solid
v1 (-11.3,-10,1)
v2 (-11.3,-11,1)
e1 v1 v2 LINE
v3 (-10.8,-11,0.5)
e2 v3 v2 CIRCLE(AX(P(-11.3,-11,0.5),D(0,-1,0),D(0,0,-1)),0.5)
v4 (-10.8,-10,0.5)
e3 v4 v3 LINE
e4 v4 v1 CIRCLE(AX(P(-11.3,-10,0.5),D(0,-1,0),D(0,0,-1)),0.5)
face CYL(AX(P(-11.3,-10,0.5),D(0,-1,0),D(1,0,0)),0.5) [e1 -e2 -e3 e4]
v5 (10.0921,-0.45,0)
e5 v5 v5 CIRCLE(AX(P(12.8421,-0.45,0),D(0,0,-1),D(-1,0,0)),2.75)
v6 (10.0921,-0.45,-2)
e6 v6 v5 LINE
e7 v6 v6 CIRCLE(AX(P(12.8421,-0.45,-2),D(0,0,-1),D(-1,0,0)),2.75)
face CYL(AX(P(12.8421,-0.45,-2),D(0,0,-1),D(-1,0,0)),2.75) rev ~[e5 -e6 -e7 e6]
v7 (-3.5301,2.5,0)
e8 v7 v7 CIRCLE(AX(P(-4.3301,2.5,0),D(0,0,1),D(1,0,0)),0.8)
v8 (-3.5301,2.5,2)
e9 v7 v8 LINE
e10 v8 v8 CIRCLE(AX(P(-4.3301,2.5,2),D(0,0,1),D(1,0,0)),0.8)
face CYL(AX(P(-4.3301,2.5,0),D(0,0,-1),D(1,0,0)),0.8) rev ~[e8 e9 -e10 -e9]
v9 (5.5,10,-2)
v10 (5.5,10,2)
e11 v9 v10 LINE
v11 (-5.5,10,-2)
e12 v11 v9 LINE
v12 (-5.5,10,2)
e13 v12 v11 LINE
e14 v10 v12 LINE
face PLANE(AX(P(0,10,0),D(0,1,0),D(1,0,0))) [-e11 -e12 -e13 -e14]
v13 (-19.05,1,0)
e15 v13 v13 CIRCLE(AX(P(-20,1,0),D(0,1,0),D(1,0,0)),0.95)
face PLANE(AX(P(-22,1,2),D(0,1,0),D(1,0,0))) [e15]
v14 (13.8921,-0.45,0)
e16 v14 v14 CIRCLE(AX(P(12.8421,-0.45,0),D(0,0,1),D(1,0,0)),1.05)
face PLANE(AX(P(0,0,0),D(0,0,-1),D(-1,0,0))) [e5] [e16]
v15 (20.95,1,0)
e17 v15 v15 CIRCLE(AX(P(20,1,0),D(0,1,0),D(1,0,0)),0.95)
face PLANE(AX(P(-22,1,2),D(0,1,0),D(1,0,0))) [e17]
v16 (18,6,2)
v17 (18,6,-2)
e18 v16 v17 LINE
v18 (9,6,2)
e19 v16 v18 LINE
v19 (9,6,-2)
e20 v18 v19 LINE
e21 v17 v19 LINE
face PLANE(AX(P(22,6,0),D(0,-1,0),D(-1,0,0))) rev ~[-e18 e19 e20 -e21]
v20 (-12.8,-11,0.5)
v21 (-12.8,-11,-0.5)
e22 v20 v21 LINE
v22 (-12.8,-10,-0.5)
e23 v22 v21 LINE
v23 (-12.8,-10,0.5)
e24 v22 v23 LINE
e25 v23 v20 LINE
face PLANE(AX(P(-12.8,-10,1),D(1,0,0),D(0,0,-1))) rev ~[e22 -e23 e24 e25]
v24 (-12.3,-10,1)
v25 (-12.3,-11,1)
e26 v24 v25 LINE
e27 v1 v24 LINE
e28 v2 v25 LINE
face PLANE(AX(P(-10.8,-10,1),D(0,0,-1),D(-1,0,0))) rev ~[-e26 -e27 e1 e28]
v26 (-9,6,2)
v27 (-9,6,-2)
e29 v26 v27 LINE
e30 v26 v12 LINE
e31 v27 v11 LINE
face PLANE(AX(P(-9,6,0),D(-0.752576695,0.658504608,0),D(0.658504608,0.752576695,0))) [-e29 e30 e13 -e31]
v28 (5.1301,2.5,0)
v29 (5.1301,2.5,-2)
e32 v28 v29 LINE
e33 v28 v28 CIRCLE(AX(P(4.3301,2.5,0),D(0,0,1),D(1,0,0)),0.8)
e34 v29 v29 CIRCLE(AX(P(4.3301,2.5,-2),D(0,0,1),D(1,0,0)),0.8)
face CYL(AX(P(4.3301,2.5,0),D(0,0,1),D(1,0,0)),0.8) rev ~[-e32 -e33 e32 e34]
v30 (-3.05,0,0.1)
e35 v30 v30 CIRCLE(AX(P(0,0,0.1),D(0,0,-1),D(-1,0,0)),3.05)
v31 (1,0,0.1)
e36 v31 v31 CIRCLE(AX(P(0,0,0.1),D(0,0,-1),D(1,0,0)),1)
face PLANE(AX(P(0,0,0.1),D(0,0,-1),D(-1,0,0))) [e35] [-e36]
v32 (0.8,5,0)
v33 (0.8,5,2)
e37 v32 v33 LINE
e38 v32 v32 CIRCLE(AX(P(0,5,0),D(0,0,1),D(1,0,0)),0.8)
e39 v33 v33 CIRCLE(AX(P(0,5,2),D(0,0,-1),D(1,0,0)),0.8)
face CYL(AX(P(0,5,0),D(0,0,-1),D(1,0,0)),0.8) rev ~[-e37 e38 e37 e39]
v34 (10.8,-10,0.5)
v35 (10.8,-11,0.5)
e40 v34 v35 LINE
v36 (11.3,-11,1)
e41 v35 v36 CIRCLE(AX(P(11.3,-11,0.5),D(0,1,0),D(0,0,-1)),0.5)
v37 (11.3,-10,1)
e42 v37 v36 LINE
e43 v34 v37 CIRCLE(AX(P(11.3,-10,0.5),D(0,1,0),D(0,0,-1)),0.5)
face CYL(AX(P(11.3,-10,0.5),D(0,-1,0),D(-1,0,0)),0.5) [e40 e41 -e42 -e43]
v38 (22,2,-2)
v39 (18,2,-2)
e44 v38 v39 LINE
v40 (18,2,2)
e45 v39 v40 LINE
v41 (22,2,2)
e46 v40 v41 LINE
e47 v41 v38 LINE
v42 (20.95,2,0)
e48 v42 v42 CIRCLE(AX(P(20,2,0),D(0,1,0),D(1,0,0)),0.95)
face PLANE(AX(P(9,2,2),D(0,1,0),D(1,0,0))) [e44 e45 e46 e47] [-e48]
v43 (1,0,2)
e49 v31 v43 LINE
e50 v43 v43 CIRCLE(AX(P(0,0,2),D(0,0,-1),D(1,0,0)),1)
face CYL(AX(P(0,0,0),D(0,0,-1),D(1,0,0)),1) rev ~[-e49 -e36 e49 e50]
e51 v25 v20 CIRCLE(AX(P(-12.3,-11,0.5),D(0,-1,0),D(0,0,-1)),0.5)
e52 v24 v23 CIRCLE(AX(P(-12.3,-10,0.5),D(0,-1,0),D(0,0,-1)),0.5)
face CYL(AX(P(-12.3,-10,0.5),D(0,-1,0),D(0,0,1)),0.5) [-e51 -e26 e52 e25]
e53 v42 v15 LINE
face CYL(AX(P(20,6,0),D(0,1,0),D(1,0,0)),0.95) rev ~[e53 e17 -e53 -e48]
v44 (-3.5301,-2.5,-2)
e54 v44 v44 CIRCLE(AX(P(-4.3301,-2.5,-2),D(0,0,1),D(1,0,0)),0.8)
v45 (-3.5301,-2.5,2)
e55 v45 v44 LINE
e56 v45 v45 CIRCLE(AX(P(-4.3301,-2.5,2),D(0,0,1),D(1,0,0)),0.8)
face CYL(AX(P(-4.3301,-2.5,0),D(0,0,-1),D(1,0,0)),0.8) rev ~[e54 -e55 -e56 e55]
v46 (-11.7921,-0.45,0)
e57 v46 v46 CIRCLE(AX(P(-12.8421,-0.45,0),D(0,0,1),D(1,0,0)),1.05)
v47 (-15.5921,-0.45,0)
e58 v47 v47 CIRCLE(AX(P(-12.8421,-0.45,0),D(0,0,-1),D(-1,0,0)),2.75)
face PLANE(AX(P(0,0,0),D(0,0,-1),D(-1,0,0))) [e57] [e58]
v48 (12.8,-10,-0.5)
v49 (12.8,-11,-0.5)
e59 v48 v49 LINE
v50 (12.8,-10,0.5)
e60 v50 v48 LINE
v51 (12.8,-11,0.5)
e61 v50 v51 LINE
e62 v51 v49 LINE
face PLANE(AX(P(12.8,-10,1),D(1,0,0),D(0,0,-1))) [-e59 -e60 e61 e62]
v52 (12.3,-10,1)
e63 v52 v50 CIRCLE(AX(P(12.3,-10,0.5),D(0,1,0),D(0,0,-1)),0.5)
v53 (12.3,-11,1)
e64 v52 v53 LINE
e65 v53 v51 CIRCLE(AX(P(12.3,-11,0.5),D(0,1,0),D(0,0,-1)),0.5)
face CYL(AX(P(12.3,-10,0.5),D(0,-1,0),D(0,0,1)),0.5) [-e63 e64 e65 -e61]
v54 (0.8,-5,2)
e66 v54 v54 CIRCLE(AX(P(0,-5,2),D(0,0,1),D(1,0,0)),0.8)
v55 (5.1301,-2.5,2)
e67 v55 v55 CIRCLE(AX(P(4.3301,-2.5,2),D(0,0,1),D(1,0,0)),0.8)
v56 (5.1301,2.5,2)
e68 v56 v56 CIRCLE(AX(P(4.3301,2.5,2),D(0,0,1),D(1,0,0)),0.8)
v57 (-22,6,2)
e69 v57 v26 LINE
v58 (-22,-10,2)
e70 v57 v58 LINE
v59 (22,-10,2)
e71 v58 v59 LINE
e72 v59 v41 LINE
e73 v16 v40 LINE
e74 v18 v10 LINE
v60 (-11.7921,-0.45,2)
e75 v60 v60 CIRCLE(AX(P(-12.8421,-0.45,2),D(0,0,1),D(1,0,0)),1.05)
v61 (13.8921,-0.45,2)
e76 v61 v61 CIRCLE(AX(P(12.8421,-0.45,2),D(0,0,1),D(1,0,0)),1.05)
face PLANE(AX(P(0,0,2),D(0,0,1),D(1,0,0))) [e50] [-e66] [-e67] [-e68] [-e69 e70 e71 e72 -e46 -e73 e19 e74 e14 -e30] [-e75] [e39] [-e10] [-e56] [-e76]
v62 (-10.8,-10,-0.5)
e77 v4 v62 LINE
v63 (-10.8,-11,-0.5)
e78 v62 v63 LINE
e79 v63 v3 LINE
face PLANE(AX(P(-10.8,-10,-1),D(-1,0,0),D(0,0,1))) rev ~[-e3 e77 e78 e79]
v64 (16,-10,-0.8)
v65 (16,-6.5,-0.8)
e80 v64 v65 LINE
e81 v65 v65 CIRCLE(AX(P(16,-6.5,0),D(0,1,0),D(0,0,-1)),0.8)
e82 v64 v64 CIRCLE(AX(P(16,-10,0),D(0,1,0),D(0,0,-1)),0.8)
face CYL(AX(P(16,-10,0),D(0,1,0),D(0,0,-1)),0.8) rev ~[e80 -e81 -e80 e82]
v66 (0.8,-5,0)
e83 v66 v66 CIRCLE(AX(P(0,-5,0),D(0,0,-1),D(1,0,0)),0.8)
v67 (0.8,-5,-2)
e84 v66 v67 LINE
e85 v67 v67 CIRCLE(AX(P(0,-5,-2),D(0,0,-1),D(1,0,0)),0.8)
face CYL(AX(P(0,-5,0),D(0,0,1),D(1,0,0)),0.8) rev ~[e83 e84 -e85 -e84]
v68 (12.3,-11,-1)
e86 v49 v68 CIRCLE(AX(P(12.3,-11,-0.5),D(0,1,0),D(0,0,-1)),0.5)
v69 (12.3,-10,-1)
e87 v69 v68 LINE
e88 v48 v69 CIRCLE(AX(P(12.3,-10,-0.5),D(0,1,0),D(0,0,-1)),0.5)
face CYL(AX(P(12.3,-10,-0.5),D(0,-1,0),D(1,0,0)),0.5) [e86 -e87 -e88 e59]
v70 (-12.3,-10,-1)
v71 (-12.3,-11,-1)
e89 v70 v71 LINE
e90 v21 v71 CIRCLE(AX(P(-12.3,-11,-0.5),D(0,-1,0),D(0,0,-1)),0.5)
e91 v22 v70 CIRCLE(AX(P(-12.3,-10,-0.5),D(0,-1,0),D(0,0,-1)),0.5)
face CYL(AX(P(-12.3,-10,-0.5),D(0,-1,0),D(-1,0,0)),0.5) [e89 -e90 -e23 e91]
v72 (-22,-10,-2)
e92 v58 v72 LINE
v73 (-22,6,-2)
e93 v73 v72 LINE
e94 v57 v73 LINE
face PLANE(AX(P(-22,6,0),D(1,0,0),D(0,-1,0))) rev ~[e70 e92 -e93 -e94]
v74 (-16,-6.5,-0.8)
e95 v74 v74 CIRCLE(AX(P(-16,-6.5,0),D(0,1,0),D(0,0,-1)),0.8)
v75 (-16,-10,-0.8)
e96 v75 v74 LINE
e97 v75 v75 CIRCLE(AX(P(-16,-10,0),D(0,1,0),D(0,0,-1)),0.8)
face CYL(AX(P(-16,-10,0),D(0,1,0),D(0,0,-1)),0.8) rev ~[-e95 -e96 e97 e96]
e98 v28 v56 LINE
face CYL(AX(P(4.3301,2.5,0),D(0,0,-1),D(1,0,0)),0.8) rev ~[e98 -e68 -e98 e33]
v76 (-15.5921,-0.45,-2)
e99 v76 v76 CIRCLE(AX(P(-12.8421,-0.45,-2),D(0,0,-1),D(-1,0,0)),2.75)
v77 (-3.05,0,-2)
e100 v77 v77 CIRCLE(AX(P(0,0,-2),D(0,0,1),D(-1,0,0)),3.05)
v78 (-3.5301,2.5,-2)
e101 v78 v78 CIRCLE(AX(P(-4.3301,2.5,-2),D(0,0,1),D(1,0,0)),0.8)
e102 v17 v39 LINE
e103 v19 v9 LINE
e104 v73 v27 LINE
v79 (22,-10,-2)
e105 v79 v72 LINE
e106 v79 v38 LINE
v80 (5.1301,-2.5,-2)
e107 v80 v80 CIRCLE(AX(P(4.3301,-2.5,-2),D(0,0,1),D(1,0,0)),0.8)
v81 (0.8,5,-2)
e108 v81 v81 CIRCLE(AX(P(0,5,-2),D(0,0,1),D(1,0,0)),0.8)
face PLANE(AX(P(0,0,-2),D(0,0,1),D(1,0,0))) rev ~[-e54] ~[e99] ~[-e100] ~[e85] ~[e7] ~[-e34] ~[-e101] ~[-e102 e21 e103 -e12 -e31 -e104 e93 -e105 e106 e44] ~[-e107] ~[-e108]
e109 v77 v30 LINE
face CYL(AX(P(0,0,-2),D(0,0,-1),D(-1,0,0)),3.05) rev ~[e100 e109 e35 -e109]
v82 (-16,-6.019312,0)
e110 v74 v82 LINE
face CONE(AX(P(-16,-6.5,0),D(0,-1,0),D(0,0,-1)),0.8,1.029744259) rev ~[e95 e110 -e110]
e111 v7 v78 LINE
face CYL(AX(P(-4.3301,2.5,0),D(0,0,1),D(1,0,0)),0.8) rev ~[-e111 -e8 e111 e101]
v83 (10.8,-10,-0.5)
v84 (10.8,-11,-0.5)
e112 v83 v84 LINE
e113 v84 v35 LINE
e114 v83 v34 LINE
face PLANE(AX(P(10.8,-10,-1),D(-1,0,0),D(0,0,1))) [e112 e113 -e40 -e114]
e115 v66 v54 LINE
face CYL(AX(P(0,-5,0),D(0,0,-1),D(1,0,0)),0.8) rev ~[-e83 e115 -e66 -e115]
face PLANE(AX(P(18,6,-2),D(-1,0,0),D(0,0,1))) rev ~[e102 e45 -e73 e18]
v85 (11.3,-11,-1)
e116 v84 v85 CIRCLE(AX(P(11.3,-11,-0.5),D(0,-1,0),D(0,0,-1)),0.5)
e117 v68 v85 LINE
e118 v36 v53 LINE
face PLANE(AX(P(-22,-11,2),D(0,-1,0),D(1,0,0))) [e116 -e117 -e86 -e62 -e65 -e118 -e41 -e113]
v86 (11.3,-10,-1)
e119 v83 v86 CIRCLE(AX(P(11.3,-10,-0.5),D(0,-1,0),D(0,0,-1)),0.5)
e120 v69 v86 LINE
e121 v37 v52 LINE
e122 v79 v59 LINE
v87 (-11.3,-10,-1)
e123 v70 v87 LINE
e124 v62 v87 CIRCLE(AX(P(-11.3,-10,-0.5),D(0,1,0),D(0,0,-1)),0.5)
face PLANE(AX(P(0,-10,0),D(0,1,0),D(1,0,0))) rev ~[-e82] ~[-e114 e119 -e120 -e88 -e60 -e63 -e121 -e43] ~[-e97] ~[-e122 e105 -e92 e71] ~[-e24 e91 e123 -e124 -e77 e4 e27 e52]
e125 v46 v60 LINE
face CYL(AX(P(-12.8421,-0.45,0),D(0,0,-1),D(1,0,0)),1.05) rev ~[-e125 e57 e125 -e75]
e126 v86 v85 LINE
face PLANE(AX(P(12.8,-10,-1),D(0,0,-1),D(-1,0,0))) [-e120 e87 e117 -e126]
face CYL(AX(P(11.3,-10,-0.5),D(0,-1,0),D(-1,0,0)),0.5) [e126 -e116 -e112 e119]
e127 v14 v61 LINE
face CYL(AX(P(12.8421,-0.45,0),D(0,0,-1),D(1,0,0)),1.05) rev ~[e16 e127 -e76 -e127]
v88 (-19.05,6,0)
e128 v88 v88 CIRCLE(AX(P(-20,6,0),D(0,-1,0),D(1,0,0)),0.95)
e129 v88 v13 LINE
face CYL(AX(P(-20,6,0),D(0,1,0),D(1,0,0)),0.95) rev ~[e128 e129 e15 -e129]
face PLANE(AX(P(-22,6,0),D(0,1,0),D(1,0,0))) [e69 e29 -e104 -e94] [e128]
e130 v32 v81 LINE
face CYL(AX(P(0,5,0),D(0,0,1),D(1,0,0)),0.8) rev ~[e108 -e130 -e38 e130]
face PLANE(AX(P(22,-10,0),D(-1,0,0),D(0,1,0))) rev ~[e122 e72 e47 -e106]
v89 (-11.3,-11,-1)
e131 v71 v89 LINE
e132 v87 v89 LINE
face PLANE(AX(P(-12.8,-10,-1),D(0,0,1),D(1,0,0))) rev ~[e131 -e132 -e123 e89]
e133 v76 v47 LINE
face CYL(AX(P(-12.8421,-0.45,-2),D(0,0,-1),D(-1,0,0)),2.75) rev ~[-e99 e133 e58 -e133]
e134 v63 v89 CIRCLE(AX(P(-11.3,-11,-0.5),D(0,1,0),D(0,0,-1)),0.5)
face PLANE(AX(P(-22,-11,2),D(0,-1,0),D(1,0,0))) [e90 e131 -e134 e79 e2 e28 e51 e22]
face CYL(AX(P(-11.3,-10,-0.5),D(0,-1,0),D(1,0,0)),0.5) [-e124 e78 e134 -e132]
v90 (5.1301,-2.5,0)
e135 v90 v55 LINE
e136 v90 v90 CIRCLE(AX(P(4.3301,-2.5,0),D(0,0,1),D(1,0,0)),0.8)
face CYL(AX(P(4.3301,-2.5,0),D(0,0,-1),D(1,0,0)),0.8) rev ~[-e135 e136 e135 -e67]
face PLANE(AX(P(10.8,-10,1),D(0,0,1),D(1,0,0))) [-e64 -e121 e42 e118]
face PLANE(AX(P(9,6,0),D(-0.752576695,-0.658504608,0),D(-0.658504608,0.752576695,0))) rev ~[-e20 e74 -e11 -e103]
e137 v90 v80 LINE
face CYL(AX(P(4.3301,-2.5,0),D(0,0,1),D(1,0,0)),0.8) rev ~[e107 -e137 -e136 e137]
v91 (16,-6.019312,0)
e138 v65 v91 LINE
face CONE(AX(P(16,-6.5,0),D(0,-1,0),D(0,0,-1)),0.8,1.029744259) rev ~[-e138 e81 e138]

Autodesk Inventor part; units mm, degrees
ref_plane "YZ Plane" through (0, 0, 0) normal (1, 0, 0) x (0, 1, 0)
ref_plane "XZ Plane" through (0, 0, 0) normal (0, 1, 0) x (-1, 0, 0)
ref_plane "XY Plane" through (0, 0, 0) normal (0, 0, 1) x (1, 0, 0)
sketch "構築線" plane through (0, 0, 0) normal (0, 0, 1) x (1, 0, 0)
  circle A0 centre (0, 0) radius 8.5
  circle A1 centre (0, 0) radius 2.8 construction
  circle A2 centre (0, 0) radius 5 construction
  line L0 (0, -10) -> (-25, -10) construction
  line L1 (0, -13) -> (-25, -13) construction
  circle A3 centre (-12.8421, -0.45) radius 10.05 construction
  circle A4 centre (-12.8421, -0.45) radius 12.55 construction
  circle A5 centre (0, 5) radius 0.8
  circle A6 centre (-4.3301, 2.5) radius 0.8
  circle A7 centre (-4.3301, -2.5) radius 0.8
  circle A8 centre (0, -5) radius 0.8
  circle A9 centre (4.3301, -2.5) radius 0.8
  circle A10 centre (4.3301, 2.5) radius 0.8
  line L2 (25, -10) -> (0, -10) construction
  circle A11 centre (12.8421, -0.45) radius 10.05 construction
  circle A12 centre (12.8421, -0.45) radius 12.55 construction
  line L3 (0, -13) -> (25, -13) construction
  line L4 (-22, -10) -> (0, -10)
  line L5 (0, 25) -> (0, -25)
  line L6 (0, -10) -> (22, -10)
  circle A13 centre (0, 0) radius 3
  circle A14 centre (0, 0) radius 1
  circle A15 centre (12.8421, -0.45) radius 1.05
  circle A16 centre (-12.8421, -0.45) radius 1.05
  circle A17 centre (12.8421, -0.45) radius 2.75
  circle A18 centre (-12.8421, -0.45) radius 2.75
  line L7 (-22, 6) -> (-22, -10)
  line L8 (22, -10) -> (22, 6)
  line L9 (-22, 6) -> (-9, 6)
  line L10 (-9, 6) -> (-5.5, 10)
  line L11 (22, 6) -> (9, 6)
  line L12 (9, 6) -> (5.5, 10)
  line L13 (-5.5, 10) -> (5.5, 10)
  point P0 (-5.5355, 6.4504)
  point P1 (5.5355, 6.4504)
  dimension "d22" = 20.1
  dimension "d41" = 20.1
  dimension "d0" = 17
  dimension "d1" = 5.6
  dimension "d2" = 10
  dimension "d12" = 25
  dimension "d13" = 10
  dimension "d14" = 0
  dimension "d17" = 0
  dimension "d18" = 25
  dimension "d19" = 3
  dimension "d23" = 25.1
  dimension "d29" = 1.6
  dimension "d30" = 0
  dimension "d31" = 5
  dimension "d34" = 360
  dimension "d38" = 25
  dimension "d42" = 25.1
  dimension "d43" = 25
  dimension "d46" = 22
  dimension "d49" = 50
  dimension "d50" = 25
  dimension "d51" = 25
  dimension "d52" = 22
  dimension "d58" = 6
  dimension "d59" = 2
  dimension "d99" = 2.1
  dimension "d100" = 2.1
  dimension "d105" = 5.5
  dimension "d106" = 5.5
  dimension "d253" = 16
  dimension "d254" = 16
  dimension "d255" = 13
  dimension "d257" = 13
  dimension "d258" = 3.5
  dimension "d259" = 3.5
  dimension "d261" = 4
extrude "押し出し11" add sketch "構築線" along normal mid plane 4 contours A0 L5 A8 A13 A5 | A0 L5 L13 L12 L11 L8 L6 | L5 A5 A13 A8 A0 | A0 L5 L4 L7 L9 L10 L13 | A13 L5 A14 | L5 A14 A13 | A17 | A18
sketch "固定穴" plane through (0, 0, -2) normal (0, 0, -1) x (-1, 0, 0)
  circle A0 centre (0, 0) radius 8.5
  line L0 (0, -8.6) -> (-25, -8.6) construction
  line L1 (25, -8.6) -> (0, -8.6) construction
  line L2 (0, 25) -> (0, -25)
  circle A1 centre (12.8421, -0.45) radius 2.75
  circle A2 centre (-12.8421, -0.45) radius 2.75
  circle A3 centre (0, 0) radius 1 projected
  circle A4 centre (-12.8421, -0.45) radius 1.05 projected
  circle A5 centre (12.8421, -0.45) radius 1.05 projected
  circle A6 centre (0, 0) radius 3.05
  dimension "d180" = 17
  dimension "d183" = 25
  dimension "d195" = 25
  dimension "d200" = 50
  dimension "d208" = 5.5
  dimension "d209" = 5.5
  dimension "d216" = 6.1
extrude "押し出し19" cut sketch "固定穴" against normal blind 2 contours A1 | A2 | A4 | A5
extrude "押し出し21" cut sketch "固定穴" against normal blind 2.1 contours A6 L2 A3 | L2 A3 A6
sketch "ねじ穴+固定(基板)" plane through (-22, -10, 2) normal (0, -1, 0) x (1, 0, 0)
  circle A0 centre (38, -2) radius 1
  line L0 (44, 0) -> (44, -4) projected
  line L1 (44, -2) -> (0, -2) construction
  line L2 (0, 0) -> (0, -4) projected
  circle A1 centre (6, -2) radius 1
  line L3 (34.8, -3) -> (32.8, -3)
  line L4 (32.8, -3) -> (32.8, -1)
  line L5 (32.8, -1) -> (34.8, -1)
  line L6 (34.8, -1) -> (34.8, -3)
  line L7 (34.8, -3) -> (32.8, -1) construction
  line L8 (32.8, -3) -> (34.8, -1) construction
  line L9 (11.2, -1) -> (9.2, -1)
  line L10 (9.2, -1) -> (9.2, -3)
  line L11 (9.2, -3) -> (11.2, -3)
  line L12 (11.2, -3) -> (11.2, -1)
  line L13 (11.2, -1) -> (9.2, -3) construction
  line L14 (9.2, -1) -> (11.2, -3) construction
  point P0 (22, -2)
  point P1 (33.8, -2)
  point P2 (33.8, -2)
  point P3 (10.2, -2)
  point P4 (10.2, -2)
  dimension "d219" = 2
  dimension "d220" = 6
  dimension "d221" = 6
  dimension "d222" = 2
  dimension "d223" = 2
  dimension "d224" = 2
  dimension "d225" = 4.2
  dimension "d226" = 2
  dimension "d227" = 2
  dimension "d228" = 4.2
hole "ねじ穴(基板)" at (16, -10, 0) at (-16, -10, 0) direction (0, 1, 0) diameter 1.6 depth 3.5 tip angle 118
extrude "押し出し22" add sketch "ねじ穴+固定(基板)" along normal blind 1 contours L3 L4 L5 L6 | L12 L11 L10 L9
fillet "フィレット1" radius 0.5 4 edges at (12.8, -10.5, -1) (12.8, -10.5, 1) (10.8, -10.5, -1) (10.8, -10.5, 1)
fillet "フィレット2" radius 0.5 4 edges at (-12.8, -10.5, -1) (-12.8, -10.5, 1) (-10.8, -10.5, -1) (-10.8, -10.5, 1)
sketch "スケッチ20" plane through (-22, 6, 2) normal (0, 1, 0) x (1, 0, 0)
  line L0 (0, 0) -> (0, 4) projected
  line L1 (13, 0) -> (0, 0) projected
  line L2 (13, 0) -> (13, 4) projected
  line L3 (0, 4) -> (13, 4) projected
  line L4 (31, 0) -> (31, 4) projected
  line L5 (44, 0) -> (31, 0) projected
  line L6 (44, 0) -> (44, 4) projected
  line L7 (31, 4) -> (44, 4) projected
  line L8 (0, 0) -> (4, 0) construction
  line L9 (4, 0) -> (4, 4) construction
  line L10 (4, 4) -> (0, 4) construction
  line L11 (0, 4) -> (0, 0) construction
  line L12 (44, 0) -> (40, 0) construction
  line L13 (40, 0) -> (40, 4) construction
  line L14 (40, 4) -> (44, 4) construction
  line L15 (44, 4) -> (44, 0) construction
  line L16 (4, 0) -> (0, 4) construction
  line L17 (0, 0) -> (4, 4) construction
  line L18 (40, 0) -> (44, 4) construction
  line L19 (44, 0) -> (44, 4) construction
  line L20 (44, 0) -> (40, 4) construction
  circle A0 centre (2, 2) radius 0.95
  circle A1 centre (42, 2) radius 0.95
  point P0 (22, 2)
  dimension "d290" = 4
  dimension "d291" = 4
  dimension "d292" = 4
  dimension "d293" = 4
  dimension "d294" = 1.9
  dimension "d295" = 1.9
extrude "押し出し28" cut sketch "スケッチ20" against normal blind 5 contours A0 | A1
sketch "外形側面（dxf出力用）" plane through (0, 0, 2) normal (0, 0, 1) x (1, 0, 0)
  line L0 (-10, 6) -> (-5.5, 10)
  line L1 (-5.5, 10) -> (-10, 6)
  line L2 (-10, 6) -> (-22, 6)
  line L3 (-22, 6) -> (-22, -11)
  line L4 (-22, -11) -> (22, -11)
  line L5 (22, -11) -> (22, 6)
  line L6 (22, 6) -> (10, 6) projected
  line L7 (5.5, 10) -> (-5.5, 10) projected
  line L8 (10, 6) -> (5.5, 10)
  line L9 (5.5, 10) -> (-5.5, 10)
  line L10 (22, 6) -> (10, 6)
  circle A0 centre (0, 0) radius 2.8 projected
  circle A1 centre (4.3301, 2.5) radius 0.8 projected
  circle A2 centre (4.3301, -2.5) radius 0.8 projected
  circle A3 centre (0, -5) radius 0.8 projected
  circle A4 centre (-4.3301, -2.5) radius 0.8 projected
  circle A5 centre (-4.3301, 2.5) radius 0.8 projected
  circle A6 centre (0, 5) radius 0.8 projected
  circle A7 centre (0, 0) radius 8.5 projected
  circle A8 centre (0, 0) radius 1 projected
  circle A9 centre (-12.8421, -0.45) radius 1.05 projected
  circle A10 centre (-12.8421, -0.45) radius 2.75 projected
  circle A11 centre (12.8421, -0.45) radius 1.05 projected
  circle A12 centre (12.8421, -0.45) radius 2.75 projected
  dimension "d2" = 10
sketch "外形底面（dxf出力用）" plane through (-22, -10, 2) normal (0, -1, 0) x (1, 0, 0)
  arc A0 (11.2, -1.5) -> (10.7, -1) centre (10.7, -1.5) ccw projected
  line L0 (10.7, -1) -> (9.7, -1) projected
  arc A1 (9.7, -1) -> (9.2, -1.5) centre (9.7, -1.5) ccw projected
  line L1 (9.2, -1.5) -> (9.2, -2.5) projected
  arc A2 (9.2, -2.5) -> (9.7, -3) centre (9.7, -2.5) ccw projected
  line L2 (9.7, -3) -> (10.7, -3) projected
  arc A3 (10.7, -3) -> (11.2, -2.5) centre (10.7, -2.5) ccw projected
  line L3 (11.2, -2.5) -> (11.2, -1.5) projected
  arc A4 (33.3, -1) -> (32.8, -1.5) centre (33.3, -1.5) ccw projected
  line L4 (32.8, -1.5) -> (32.8, -2.5) projected
  arc A5 (32.8, -2.5) -> (33.3, -3) centre (33.3, -2.5) ccw projected
  line L5 (33.3, -3) -> (34.3, -3) projected
  arc A6 (34.3, -3) -> (34.8, -2.5) centre (34.3, -2.5) ccw projected
  line L6 (34.8, -2.5) -> (34.8, -1.5) projected
  arc A7 (34.8, -1.5) -> (34.3, -1) centre (34.3, -1.5) ccw projected
  line L7 (34.3, -1) -> (33.3, -1) projected
  circle A8 centre (38, -2) radius 0.8 projected
  circle A9 centre (6, -2) radius 0.8 projected
  line L8 (31, -4) -> (44, -4) projected
  line L9 (0, -4) -> (13, -4) projected
  line L10 (13, 0) -> (0, 0) projected
  line L11 (44, 0) -> (31, 0) projected
  line L12 (0, 0) -> (0, -4) projected
  line L13 (44, 0) -> (44, -4) projected
  line L14 (31, 0) -> (31, -4) projected
  line L15 (31, -4) -> (31, 0)
  line L16 (31, 0) -> (13, 0)
  line L17 (13, 0) -> (13, -4) projected
  line L18 (13, 0) -> (13, -4)
  line L19 (13, -4) -> (31, -4)
  point P0 (22, -2)
sketch "外形上面(dxf出力用)" plane through (-22, 6, 2) normal (0, 1, 0) x (1, 0, 0)
  line L0 (44, 4) -> (0, 4) projected
  line L1 (44, 0) -> (44, 4) projected
  line L2 (0, 0) -> (44, 0) projected
  line L3 (0, 0) -> (0, 4) projected
  circle A0 centre (2, 2) radius 0.95 projected
  circle A1 centre (42, 2) radius 0.95 projected
  point P0 (22, 2)
  point P1 (13, 4)
sketch "スケッチ25" plane through (0, 0, -2) normal (0, 0, -1) x (-1, 0, 0)
  circle A0 centre (-12.8421, -0.45) radius 1.05 projected
  circle A1 centre (0, 0) radius 1 projected
  circle A2 centre (12.8421, -0.45) radius 1.05 projected
  line L0 (12.3, -11) -> (11.3, -11) projected
  line L1 (-11.3, -11) -> (-12.3, -11) projected
  line L2 (5.5, 10) -> (-5.5, 10) projected
  line L3 (-5.5, 10) -> (-9, 6) projected
  line L4 (-9, 6) -> (-22, 6) projected
  line L5 (-22, 6) -> (-22, -10) projected
  line L6 (9, 6) -> (5.5, 10) projected
  line L7 (22, 6) -> (9, 6) projected
  line L8 (22, -10) -> (22, 6) projected
  circle A3 centre (0, 5) radius 0.8 projected
  circle A4 centre (-4.3301, 2.5) radius 0.8 projected
  circle A5 centre (-4.3301, -2.5) radius 0.8 projected
  circle A6 centre (0, -5) radius 0.8 projected
  circle A7 centre (4.3301, -2.5) radius 0.8 projected
  circle A8 centre (4.3301, 2.5) radius 0.8 projected
  line L9 (-22, -10) -> (-22, -11)
  line L10 (-22, -11) -> (-12.3, -11)
  line L11 (-11.3, -11) -> (11.3, -11)
  line L12 (12.3, -11) -> (22, -11)
  line L13 (22, -11) -> (22, -10)
  circle A9 centre (12.8421, -0.45) radius 2.75 projected
  circle A10 centre (-12.8421, -0.45) radius 2.75 projected
  circle A11 centre (0, 0) radius 3.05 projected
sketch "冶具" plane through (0, 0, 2) normal (0, 0, 1) x (1, 0, 0)
  line L0 (-19, 6) -> (-9, 6)
  line L1 (-5.5, 10) -> (5.5, 10)
  line L2 (9, 6) -> (19, 6)
  line L3 (-11.3, -11) -> (-12.3, -11) construction
  line L4 (12.3, -11) -> (11.3, -11) construction
  line L5 (22, 6) -> (22, -11)
  line L6 (-22, 6) -> (-22, -11)
  line L7 (-19, -11) -> (19, -11)
  line L8 (-22, 6) -> (-22, 7.5)
  line L9 (-22, 7.5) -> (-19, 7.5)
  line L10 (-19, 7.5) -> (-19, 6)
  line L11 (-5.5, 10) -> (-7, 10)
  line L12 (-7, 10) -> (-7, 8.2857)
  line L13 (-7, 8.2857) -> (-9, 6)
  line L14 (-5.5, 10) -> (5.5, 10) projected
  line L15 (5.5, 10) -> (7, 10)
  line L16 (7, 10) -> (7, 8.2857)
  line L17 (7, 8.2857) -> (9, 6)
  line L18 (19, -11) -> (19, -12.5)
  line L19 (19, -12.5) -> (22, -12.5)
  line L20 (22, -12.5) -> (22, -11)
  line L21 (-22, -11) -> (-22, -12.5)
  line L22 (-22, -12.5) -> (-19, -12.5)
  line L23 (-19, -12.5) -> (-19, -11)
  line L24 (22, 6) -> (22, 7.5)
  line L25 (22, 7.5) -> (19, 7.5)
  line L26 (19, 7.5) -> (19, 6)
  point P0 (0, 0)
  dimension "d310" = 3
  dimension "d311" = 3
  dimension "d316" = 1.5
  dimension "d317" = 1.5
  dimension "d318" = 1.5
  dimension "d319" = 1.5
  dimension "d320" = 38
  dimension "d321" = 17
  dimension "d322" = 17
  dimension "d323" = 11
  dimension "d324" = 10
  dimension "d325" = 10
  dimension "d326" = 3
  dimension "d327" = 3
  dimension "d328" = 2
  dimension "d329" = 2
  dimension "d330" = 1.5
  dimension "d331" = 1.5
sketch "スケッチ27" plane through (-22, -10, 2) normal (0, -1, 0) x (1, 0, 0)
  line L0 (32.8, -2.5) -> (32.8, -1.5) construction
  arc A0 (33.3, -1) -> (32.8, -1.5) centre (33.3, -1.5) ccw construction
  line L1 (33.3, -1) -> (34.3, -1) construction
  arc A1 (34.8, -1.5) -> (34.3, -1) centre (34.3, -1.5) ccw construction
  line L2 (34.8, -1.5) -> (34.8, -2.5) construction
  arc A2 (34.3, -3) -> (34.8, -2.5) centre (34.3, -2.5) ccw construction
  line L3 (34.3, -3) -> (33.3, -3) construction
  arc A3 (32.8, -2.5) -> (33.3, -3) centre (33.3, -2.5) ccw construction
  line L4 (11.2, -1.5) -> (11.2, -2.5) construction
  arc A4 (10.7, -3) -> (11.2, -2.5) centre (10.7, -2.5) ccw construction
  line L5 (10.7, -3) -> (9.7, -3) construction
  arc A5 (9.2, -2.5) -> (9.7, -3) centre (9.7, -2.5) ccw construction
  line L6 (9.2, -2.5) -> (9.2, -1.5) construction
  arc A6 (9.7, -1) -> (9.2, -1.5) centre (9.7, -1.5) ccw construction
  line L7 (9.7, -1) -> (10.7, -1) construction
  arc A7 (11.2, -1.5) -> (10.7, -1) centre (10.7, -1.5) ccw construction
  circle A8 centre (38, -2) radius 0.8 construction
  circle A9 centre (6, -2) radius 0.8 construction
  line L8 (44, 0) -> (44, -4) construction
  line L9 (0, 0) -> (44, 0) construction
  line L10 (0, 0) -> (0, -4) construction
  line L11 (44, -4) -> (0, -4) construction
  line L12 (0, 0) -> (0, 1.5)
  line L13 (0, 1.5) -> (3, 1.5)
  line L14 (3, 1.5) -> (3, 0)
  line L15 (3, 0) -> (41, 0)
  line L16 (0, 0) -> (44, 0) projected
  line L17 (44, 0) -> (44, 1.5)
  line L18 (44, 1.5) -> (41, 1.5)
  line L19 (41, 1.5) -> (41, 0)
  line L20 (0, -4) -> (0, -5.5)
  line L21 (0, -5.5) -> (3, -5.5)
  line L22 (3, -5.5) -> (3, -4)
  line L23 (44, -4) -> (44, -5.5)
  line L24 (44, -5.5) -> (41, -5.5)
  line L25 (41, -5.5) -> (41, -4)
  line L26 (41, -4) -> (3, -4)
  line L27 (44, 0) -> (44, -4)
  line L28 (0, 0) -> (0, -4)
  circle A10 centre (42, -2) radius 0.95 projected
  circle A11 centre (2, -2) radius 0.95 projected
  point P0 (22, -2)
  dimension "d332" = 1.5
  dimension "d333" = 3
  dimension "d334" = 1.5
  dimension "d335" = 3
  dimension "d336" = 1.5
  dimension "d337" = 3
  dimension "d338" = 1.5
  dimension "d339" = 3
sketch "スケッチ28" plane through (-5.5, 10, 2) normal (0, 1, 0) x (1, 0, 0)
  line L0 (14.5, 0) -> (14.5, 4) projected
  line L1 (-3.5, 0) -> (-3.5, 4) projected
  line L2 (-3.5, 4) -> (-3.5, 5.5)
  line L3 (-3.5, 5.5) -> (-0.5, 5.5)
  line L4 (-0.5, 5.5) -> (-0.5, 4)
  line L5 (-3.5, 0) -> (-3.5, -1.5)
  line L6 (-3.5, -1.5) -> (-0.5, -1.5)
  line L7 (-0.5, -1.5) -> (-0.5, 0)
  line L8 (14.5, 4) -> (14.5, 5.5)
  line L9 (14.5, 5.5) -> (11.5, 5.5)
  line L10 (11.5, 5.5) -> (11.5, 4)
  line L11 (14.5, 0) -> (14.5, -1.5)
  line L12 (14.5, -1.5) -> (11.5, -1.5)
  line L13 (11.5, -1.5) -> (11.5, 0)
  line L14 (11.5, 0) -> (-0.5, 0)
  line L15 (-0.5, 4) -> (11.5, 4)
  circle A0 centre (21.5, 2) radius 0.8 projected
  circle A1 centre (-10.5, 2) radius 0.8 projected
  line L16 (17.8, 1) -> (16.8, 1) projected
  arc A2 (17.8, 1) -> (18.3, 1.5) centre (17.8, 1.5) ccw projected
  line L17 (18.3, 2.5) -> (18.3, 1.5) projected
  arc A3 (18.3, 2.5) -> (17.8, 3) centre (17.8, 2.5) ccw projected
  line L18 (16.8, 3) -> (17.8, 3) projected
  arc A4 (16.8, 3) -> (16.3, 2.5) centre (16.8, 2.5) ccw projected
  line L19 (16.3, 1.5) -> (16.3, 2.5) projected
  arc A5 (16.3, 1.5) -> (16.8, 1) centre (16.8, 1.5) ccw projected
  line L20 (-5.8, 1) -> (-6.8, 1) projected
  arc A6 (-5.8, 1) -> (-5.3, 1.5) centre (-5.8, 1.5) ccw projected
  line L21 (-5.3, 2.5) -> (-5.3, 1.5) projected
  arc A7 (-5.3, 2.5) -> (-5.8, 3) centre (-5.8, 2.5) ccw projected
  line L22 (-6.8, 3) -> (-5.8, 3) projected
  arc A8 (-6.8, 3) -> (-7.3, 2.5) centre (-6.8, 2.5) ccw projected
  line L23 (-7.3, 1.5) -> (-7.3, 2.5) projected
  arc A9 (-7.3, 1.5) -> (-6.8, 1) centre (-6.8, 1.5) ccw projected
  point P0 (5.5, 2)
  dimension "d340" = 1.5
  dimension "d341" = 3
  dimension "d342" = 1.5
  dimension "d343" = 3
  dimension "d344" = 1.5
  dimension "d345" = 3
  dimension "d346" = 1.5
  dimension "d347" = 3
sketch "スケッチ29" plane through (9, 6, 2) normal (0, 1, 0) x (1, 0, 0)
  line L0 (13, 4) -> (-31, 4) projected
  line L1 (13, 4) -> (9, 4)
  line L2 (9, 4) -> (9, 0)
  line L3 (9, 0) -> (13, 0)
  line L4 (13, 0) -> (13, 4)
  point P0 (-9, 2)
  dimension "d348" = 4
  dimension "d349" = 4
extrude "押し出し29" cut sketch "スケッチ29" against normal blind 4
equation "\"d18\" = d12"
properties part number "m_mount_r"
